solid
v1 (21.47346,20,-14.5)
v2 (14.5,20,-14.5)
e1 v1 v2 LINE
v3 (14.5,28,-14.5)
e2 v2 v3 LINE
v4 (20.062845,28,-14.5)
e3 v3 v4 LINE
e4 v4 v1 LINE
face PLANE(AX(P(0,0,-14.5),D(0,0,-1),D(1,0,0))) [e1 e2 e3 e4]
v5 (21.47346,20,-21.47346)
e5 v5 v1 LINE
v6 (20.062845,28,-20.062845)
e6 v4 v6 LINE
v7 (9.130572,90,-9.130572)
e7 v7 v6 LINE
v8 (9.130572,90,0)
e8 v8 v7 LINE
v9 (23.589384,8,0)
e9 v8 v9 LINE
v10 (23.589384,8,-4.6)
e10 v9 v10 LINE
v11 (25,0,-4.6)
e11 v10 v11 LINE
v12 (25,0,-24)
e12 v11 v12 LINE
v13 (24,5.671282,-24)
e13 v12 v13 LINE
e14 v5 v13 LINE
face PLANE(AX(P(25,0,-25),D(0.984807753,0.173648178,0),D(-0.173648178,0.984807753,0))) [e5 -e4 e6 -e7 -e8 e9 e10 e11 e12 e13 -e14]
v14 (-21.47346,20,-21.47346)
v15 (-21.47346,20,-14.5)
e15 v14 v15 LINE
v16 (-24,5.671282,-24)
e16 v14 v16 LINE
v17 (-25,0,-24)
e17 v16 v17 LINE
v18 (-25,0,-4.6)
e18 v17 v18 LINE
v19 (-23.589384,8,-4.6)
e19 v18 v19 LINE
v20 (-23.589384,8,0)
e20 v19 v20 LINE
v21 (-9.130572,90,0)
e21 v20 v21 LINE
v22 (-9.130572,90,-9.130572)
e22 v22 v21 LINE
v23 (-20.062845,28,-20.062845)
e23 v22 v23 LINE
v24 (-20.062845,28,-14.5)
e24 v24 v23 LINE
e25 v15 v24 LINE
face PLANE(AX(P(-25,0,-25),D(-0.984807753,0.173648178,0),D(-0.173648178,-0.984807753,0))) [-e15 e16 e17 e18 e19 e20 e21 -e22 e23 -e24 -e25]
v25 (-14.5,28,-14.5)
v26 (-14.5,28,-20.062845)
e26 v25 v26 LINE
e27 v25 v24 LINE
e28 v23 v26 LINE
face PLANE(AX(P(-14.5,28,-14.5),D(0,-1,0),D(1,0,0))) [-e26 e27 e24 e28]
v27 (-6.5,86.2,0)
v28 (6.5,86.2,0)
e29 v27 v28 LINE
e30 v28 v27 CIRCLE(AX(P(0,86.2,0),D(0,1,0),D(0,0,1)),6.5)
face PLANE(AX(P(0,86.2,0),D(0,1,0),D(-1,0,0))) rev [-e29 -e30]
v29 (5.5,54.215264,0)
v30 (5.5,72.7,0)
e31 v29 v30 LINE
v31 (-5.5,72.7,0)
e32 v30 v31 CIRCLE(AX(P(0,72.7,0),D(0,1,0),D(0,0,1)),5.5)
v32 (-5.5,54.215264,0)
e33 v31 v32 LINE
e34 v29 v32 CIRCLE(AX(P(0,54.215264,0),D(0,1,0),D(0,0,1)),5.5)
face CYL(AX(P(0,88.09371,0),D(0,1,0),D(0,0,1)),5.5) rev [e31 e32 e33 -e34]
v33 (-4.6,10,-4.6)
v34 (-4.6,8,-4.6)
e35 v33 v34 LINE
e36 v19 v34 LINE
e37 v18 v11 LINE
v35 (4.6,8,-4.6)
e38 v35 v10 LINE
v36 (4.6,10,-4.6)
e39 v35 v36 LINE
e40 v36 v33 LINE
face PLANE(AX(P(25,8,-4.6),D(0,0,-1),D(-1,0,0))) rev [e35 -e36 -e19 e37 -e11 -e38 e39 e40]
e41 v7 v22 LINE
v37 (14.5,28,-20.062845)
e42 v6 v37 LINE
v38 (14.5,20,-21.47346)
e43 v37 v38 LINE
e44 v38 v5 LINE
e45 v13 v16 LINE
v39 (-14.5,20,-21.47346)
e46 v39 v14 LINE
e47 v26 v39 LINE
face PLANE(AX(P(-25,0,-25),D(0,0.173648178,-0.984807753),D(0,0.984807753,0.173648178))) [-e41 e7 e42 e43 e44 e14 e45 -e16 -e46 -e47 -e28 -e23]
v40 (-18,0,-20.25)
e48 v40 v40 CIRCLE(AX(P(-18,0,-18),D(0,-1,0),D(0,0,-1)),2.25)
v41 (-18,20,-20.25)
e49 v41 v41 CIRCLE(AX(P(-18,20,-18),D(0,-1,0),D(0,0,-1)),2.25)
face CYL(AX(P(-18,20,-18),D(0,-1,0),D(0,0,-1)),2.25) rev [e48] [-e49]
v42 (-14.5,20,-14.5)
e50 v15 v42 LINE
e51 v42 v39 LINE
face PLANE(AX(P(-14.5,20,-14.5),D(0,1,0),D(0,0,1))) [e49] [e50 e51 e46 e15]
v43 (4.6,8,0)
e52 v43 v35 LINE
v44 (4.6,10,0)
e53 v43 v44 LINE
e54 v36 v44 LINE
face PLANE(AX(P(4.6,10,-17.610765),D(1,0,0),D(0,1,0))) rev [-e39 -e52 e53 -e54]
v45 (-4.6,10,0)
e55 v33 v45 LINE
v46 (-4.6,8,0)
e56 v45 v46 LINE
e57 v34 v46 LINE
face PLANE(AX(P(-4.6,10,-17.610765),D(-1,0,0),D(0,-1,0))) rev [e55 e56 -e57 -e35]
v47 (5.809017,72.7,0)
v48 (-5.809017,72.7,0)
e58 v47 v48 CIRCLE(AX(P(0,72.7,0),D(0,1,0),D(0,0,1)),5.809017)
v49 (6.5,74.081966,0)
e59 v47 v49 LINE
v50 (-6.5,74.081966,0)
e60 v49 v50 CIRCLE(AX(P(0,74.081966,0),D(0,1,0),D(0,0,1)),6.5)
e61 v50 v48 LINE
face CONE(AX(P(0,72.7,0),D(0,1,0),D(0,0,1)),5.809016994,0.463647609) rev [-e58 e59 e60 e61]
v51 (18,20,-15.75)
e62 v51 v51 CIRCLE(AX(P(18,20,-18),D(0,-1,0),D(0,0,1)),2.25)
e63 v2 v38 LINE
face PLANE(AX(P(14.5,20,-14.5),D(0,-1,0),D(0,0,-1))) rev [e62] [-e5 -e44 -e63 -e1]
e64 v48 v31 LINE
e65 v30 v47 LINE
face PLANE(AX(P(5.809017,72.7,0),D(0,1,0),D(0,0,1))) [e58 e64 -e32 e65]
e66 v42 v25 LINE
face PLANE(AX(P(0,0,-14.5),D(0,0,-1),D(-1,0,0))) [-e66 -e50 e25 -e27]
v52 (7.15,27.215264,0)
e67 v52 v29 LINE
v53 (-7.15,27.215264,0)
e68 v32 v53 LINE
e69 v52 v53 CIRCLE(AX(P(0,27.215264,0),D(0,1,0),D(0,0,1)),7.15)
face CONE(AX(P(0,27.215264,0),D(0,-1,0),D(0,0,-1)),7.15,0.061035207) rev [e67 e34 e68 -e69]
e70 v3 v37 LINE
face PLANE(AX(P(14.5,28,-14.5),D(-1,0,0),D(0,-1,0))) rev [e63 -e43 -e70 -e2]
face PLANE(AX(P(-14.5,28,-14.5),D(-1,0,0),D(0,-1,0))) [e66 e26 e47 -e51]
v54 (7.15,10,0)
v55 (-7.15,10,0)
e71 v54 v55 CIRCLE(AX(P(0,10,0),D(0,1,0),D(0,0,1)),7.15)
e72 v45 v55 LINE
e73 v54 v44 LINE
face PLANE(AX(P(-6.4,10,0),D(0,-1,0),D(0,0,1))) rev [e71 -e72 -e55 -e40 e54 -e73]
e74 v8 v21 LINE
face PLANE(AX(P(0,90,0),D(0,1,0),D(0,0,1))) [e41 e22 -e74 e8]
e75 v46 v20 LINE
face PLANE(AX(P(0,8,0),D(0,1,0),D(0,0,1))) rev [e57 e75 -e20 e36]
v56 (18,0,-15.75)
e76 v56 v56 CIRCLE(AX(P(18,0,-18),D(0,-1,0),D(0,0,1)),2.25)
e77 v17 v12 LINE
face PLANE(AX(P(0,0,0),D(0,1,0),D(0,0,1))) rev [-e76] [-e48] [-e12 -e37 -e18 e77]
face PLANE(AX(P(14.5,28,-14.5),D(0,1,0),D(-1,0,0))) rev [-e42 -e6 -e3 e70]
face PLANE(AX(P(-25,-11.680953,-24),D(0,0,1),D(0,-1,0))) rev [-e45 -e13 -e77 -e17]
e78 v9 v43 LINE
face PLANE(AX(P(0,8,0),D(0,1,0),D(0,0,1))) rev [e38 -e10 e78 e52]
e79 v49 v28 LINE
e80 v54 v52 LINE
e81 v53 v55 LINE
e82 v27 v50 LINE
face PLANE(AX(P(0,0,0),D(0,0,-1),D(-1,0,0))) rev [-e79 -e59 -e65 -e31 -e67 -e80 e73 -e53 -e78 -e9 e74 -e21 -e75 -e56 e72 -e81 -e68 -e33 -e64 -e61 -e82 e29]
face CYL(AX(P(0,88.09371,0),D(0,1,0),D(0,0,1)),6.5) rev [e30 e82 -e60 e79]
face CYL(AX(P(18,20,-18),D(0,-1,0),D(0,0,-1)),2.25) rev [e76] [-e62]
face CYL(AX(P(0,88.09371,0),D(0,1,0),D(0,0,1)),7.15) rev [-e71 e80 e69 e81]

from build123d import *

# Parameters (mm, degrees)
SKETCH_2_W               = 50
SKETCH_2_H               = 50
EXTRUDE_1_DEPTH          = 90
EXTRUDE_1_TAPER          = 10
SKETCH_3_W               = 215.720321278
SKETCH_3_H               = 290.879799434
CUT_EXTRUDE_1_DEPTH      = 97.695398174
SKETCH_7_W               = 4.6
SKETCH_7_H               = 23.792731937
SKETCH_8_W               = 50
SKETCH_8_H               = 4.6
CUT_EXTRUDE_2_DEPTH      = 8
SKETCH_9_W               = 9.2
SKETCH_9_H               = 9.2
CUT_EXTRUDE_3_DEPTH      = 4.6
SKETCH_10_W              = 7
SKETCH_10_H              = 8
CUT_EXTRUDE_4_DEPTH      = 10.5
SKETCH_11_R              = 2.25
CUT_EXTRUDE_5_DEPTH      = 20
CUT_EXTRUDE_6_DEPTH      = 97.695398174
CUT_EXTRUDE_6_DEPTH_BACK = 97.695398174
SKETCH_12_W              = 75.055418853
SKETCH_12_H              = 23.361905794


with BuildPart() as part:
    # 草圖2 → 填料-伸長1 (new body)
    with BuildSketch(Plane(origin=(0, 0, 0), x_dir=(1, 0, 0), z_dir=(0, 1, 0))):
        Rectangle(SKETCH_2_W, SKETCH_2_H)
    extrude(amount=EXTRUDE_1_DEPTH, taper=EXTRUDE_1_TAPER)

    # 草圖3 → 除料-伸長1 (cut, through all)
    with BuildSketch(Plane.XY):
        Rectangle(SKETCH_3_W, SKETCH_3_H)
    extrude(amount=CUT_EXTRUDE_1_DEPTH, mode=Mode.SUBTRACT)


with BuildPart() as body_2:
    # stick_antenna_434MHz: read off the stored shape, not the designer's step
    # stick_antenna_434MHz outline → stick_antenna_434MHz (revolve)
    with BuildSketch(Plane.XY):
        Polygon((0, 86.2), (0, 10), (6.65, 10), (6.65, 27.2), (5, 54.2), (5, 73.2), (5.5, 73.2), (6, 74.2), (6, 86.2), align=None)
    revolve(axis=Axis((0, 0, 0), (0, 1, 0)))


with BuildPart() as part_1:
    add(part.part)

    # Other 1: read off the stored shape, not the designer's step
    # Other 1: cut body 2
    add(body_2.part, mode=Mode.SUBTRACT)

    # 草圖14 → 除料-旋轉2 (revolve, cut)
    with BuildSketch(Plane.XY):
        Polygon((7.15, 10), (0, 10), (0, 86.2), (6.5, 86.2), (6.5, 74.081966011), (5.809016994, 72.7), (5.5, 72.7), (5.5, 54.21526354), (7.15, 27.21526354), align=None)
    revolve(axis=Axis((0, 88.093709872, 0), (0, -1, 0)), mode=Mode.SUBTRACT)

    # 草圖7 → 除料-旋轉1 (revolve, cut)
    with BuildSketch(Plane.XY):
        with Locations((2.3, 11.896365969)):
            Rectangle(SKETCH_7_W, SKETCH_7_H)
    revolve(axis=Axis((0, 30.263839144, 0), (0, -1, 0)), mode=Mode.SUBTRACT)

    # 草圖8 → 除料-伸長2 (cut)
    with BuildSketch(Plane.XZ):
        with Locations((0, -2.3)):
            Rectangle(SKETCH_8_W, SKETCH_8_H)
    extrude(amount=-CUT_EXTRUDE_2_DEPTH, mode=Mode.SUBTRACT)

    # 草圖9 → 除料-伸長3 (cut)
    with BuildSketch(Plane.XY):
        with Locations((0, 5.4)):
            Rectangle(SKETCH_9_W, SKETCH_9_H)
    extrude(amount=-CUT_EXTRUDE_3_DEPTH, mode=Mode.SUBTRACT)

    # 草圖10 → 除料-伸長4 (cut)
    with BuildSketch(Plane.XY.offset(-25)):
        with Locations((-18, 24)):
            Rectangle(SKETCH_10_W, SKETCH_10_H)
    cut_extrude_4 = extrude(amount=CUT_EXTRUDE_4_DEPTH, mode=Mode.SUBTRACT)

    # 草圖11 → 除料-伸長5 (cut)
    with BuildSketch(Plane.XZ):
        with Locations(Location((-18, -18, 0), (0, 0, 270))):
            Circle(SKETCH_11_R)
        with Locations(Location((18, -18, 0), (0, 0, 90))):
            Circle(SKETCH_11_R)
    extrude(amount=-CUT_EXTRUDE_5_DEPTH, mode=Mode.SUBTRACT)

    # 鏡射2: 除料-伸長4 across plane
    add(cut_extrude_4.mirror(Plane(origin=(0, 0, 0), x_dir=(0, 0, 1), z_dir=(1, 0, 0))), mode=Mode.SUBTRACT)

    # 草圖12 → 除料-伸長6 (cut, two sides: drawn at the far end of the back side and taken through both)
    with BuildSketch(Plane(origin=(0, 0, 0), x_dir=(0, 0, -1), z_dir=(1, 0, 0)).offset(-CUT_EXTRUDE_6_DEPTH_BACK)):
        with Locations((61.527709427, 0)):
            Rectangle(SKETCH_12_W, SKETCH_12_H)
    extrude(amount=CUT_EXTRUDE_6_DEPTH + CUT_EXTRUDE_6_DEPTH_BACK, mode=Mode.SUBTRACT)


solid = part_1.part
